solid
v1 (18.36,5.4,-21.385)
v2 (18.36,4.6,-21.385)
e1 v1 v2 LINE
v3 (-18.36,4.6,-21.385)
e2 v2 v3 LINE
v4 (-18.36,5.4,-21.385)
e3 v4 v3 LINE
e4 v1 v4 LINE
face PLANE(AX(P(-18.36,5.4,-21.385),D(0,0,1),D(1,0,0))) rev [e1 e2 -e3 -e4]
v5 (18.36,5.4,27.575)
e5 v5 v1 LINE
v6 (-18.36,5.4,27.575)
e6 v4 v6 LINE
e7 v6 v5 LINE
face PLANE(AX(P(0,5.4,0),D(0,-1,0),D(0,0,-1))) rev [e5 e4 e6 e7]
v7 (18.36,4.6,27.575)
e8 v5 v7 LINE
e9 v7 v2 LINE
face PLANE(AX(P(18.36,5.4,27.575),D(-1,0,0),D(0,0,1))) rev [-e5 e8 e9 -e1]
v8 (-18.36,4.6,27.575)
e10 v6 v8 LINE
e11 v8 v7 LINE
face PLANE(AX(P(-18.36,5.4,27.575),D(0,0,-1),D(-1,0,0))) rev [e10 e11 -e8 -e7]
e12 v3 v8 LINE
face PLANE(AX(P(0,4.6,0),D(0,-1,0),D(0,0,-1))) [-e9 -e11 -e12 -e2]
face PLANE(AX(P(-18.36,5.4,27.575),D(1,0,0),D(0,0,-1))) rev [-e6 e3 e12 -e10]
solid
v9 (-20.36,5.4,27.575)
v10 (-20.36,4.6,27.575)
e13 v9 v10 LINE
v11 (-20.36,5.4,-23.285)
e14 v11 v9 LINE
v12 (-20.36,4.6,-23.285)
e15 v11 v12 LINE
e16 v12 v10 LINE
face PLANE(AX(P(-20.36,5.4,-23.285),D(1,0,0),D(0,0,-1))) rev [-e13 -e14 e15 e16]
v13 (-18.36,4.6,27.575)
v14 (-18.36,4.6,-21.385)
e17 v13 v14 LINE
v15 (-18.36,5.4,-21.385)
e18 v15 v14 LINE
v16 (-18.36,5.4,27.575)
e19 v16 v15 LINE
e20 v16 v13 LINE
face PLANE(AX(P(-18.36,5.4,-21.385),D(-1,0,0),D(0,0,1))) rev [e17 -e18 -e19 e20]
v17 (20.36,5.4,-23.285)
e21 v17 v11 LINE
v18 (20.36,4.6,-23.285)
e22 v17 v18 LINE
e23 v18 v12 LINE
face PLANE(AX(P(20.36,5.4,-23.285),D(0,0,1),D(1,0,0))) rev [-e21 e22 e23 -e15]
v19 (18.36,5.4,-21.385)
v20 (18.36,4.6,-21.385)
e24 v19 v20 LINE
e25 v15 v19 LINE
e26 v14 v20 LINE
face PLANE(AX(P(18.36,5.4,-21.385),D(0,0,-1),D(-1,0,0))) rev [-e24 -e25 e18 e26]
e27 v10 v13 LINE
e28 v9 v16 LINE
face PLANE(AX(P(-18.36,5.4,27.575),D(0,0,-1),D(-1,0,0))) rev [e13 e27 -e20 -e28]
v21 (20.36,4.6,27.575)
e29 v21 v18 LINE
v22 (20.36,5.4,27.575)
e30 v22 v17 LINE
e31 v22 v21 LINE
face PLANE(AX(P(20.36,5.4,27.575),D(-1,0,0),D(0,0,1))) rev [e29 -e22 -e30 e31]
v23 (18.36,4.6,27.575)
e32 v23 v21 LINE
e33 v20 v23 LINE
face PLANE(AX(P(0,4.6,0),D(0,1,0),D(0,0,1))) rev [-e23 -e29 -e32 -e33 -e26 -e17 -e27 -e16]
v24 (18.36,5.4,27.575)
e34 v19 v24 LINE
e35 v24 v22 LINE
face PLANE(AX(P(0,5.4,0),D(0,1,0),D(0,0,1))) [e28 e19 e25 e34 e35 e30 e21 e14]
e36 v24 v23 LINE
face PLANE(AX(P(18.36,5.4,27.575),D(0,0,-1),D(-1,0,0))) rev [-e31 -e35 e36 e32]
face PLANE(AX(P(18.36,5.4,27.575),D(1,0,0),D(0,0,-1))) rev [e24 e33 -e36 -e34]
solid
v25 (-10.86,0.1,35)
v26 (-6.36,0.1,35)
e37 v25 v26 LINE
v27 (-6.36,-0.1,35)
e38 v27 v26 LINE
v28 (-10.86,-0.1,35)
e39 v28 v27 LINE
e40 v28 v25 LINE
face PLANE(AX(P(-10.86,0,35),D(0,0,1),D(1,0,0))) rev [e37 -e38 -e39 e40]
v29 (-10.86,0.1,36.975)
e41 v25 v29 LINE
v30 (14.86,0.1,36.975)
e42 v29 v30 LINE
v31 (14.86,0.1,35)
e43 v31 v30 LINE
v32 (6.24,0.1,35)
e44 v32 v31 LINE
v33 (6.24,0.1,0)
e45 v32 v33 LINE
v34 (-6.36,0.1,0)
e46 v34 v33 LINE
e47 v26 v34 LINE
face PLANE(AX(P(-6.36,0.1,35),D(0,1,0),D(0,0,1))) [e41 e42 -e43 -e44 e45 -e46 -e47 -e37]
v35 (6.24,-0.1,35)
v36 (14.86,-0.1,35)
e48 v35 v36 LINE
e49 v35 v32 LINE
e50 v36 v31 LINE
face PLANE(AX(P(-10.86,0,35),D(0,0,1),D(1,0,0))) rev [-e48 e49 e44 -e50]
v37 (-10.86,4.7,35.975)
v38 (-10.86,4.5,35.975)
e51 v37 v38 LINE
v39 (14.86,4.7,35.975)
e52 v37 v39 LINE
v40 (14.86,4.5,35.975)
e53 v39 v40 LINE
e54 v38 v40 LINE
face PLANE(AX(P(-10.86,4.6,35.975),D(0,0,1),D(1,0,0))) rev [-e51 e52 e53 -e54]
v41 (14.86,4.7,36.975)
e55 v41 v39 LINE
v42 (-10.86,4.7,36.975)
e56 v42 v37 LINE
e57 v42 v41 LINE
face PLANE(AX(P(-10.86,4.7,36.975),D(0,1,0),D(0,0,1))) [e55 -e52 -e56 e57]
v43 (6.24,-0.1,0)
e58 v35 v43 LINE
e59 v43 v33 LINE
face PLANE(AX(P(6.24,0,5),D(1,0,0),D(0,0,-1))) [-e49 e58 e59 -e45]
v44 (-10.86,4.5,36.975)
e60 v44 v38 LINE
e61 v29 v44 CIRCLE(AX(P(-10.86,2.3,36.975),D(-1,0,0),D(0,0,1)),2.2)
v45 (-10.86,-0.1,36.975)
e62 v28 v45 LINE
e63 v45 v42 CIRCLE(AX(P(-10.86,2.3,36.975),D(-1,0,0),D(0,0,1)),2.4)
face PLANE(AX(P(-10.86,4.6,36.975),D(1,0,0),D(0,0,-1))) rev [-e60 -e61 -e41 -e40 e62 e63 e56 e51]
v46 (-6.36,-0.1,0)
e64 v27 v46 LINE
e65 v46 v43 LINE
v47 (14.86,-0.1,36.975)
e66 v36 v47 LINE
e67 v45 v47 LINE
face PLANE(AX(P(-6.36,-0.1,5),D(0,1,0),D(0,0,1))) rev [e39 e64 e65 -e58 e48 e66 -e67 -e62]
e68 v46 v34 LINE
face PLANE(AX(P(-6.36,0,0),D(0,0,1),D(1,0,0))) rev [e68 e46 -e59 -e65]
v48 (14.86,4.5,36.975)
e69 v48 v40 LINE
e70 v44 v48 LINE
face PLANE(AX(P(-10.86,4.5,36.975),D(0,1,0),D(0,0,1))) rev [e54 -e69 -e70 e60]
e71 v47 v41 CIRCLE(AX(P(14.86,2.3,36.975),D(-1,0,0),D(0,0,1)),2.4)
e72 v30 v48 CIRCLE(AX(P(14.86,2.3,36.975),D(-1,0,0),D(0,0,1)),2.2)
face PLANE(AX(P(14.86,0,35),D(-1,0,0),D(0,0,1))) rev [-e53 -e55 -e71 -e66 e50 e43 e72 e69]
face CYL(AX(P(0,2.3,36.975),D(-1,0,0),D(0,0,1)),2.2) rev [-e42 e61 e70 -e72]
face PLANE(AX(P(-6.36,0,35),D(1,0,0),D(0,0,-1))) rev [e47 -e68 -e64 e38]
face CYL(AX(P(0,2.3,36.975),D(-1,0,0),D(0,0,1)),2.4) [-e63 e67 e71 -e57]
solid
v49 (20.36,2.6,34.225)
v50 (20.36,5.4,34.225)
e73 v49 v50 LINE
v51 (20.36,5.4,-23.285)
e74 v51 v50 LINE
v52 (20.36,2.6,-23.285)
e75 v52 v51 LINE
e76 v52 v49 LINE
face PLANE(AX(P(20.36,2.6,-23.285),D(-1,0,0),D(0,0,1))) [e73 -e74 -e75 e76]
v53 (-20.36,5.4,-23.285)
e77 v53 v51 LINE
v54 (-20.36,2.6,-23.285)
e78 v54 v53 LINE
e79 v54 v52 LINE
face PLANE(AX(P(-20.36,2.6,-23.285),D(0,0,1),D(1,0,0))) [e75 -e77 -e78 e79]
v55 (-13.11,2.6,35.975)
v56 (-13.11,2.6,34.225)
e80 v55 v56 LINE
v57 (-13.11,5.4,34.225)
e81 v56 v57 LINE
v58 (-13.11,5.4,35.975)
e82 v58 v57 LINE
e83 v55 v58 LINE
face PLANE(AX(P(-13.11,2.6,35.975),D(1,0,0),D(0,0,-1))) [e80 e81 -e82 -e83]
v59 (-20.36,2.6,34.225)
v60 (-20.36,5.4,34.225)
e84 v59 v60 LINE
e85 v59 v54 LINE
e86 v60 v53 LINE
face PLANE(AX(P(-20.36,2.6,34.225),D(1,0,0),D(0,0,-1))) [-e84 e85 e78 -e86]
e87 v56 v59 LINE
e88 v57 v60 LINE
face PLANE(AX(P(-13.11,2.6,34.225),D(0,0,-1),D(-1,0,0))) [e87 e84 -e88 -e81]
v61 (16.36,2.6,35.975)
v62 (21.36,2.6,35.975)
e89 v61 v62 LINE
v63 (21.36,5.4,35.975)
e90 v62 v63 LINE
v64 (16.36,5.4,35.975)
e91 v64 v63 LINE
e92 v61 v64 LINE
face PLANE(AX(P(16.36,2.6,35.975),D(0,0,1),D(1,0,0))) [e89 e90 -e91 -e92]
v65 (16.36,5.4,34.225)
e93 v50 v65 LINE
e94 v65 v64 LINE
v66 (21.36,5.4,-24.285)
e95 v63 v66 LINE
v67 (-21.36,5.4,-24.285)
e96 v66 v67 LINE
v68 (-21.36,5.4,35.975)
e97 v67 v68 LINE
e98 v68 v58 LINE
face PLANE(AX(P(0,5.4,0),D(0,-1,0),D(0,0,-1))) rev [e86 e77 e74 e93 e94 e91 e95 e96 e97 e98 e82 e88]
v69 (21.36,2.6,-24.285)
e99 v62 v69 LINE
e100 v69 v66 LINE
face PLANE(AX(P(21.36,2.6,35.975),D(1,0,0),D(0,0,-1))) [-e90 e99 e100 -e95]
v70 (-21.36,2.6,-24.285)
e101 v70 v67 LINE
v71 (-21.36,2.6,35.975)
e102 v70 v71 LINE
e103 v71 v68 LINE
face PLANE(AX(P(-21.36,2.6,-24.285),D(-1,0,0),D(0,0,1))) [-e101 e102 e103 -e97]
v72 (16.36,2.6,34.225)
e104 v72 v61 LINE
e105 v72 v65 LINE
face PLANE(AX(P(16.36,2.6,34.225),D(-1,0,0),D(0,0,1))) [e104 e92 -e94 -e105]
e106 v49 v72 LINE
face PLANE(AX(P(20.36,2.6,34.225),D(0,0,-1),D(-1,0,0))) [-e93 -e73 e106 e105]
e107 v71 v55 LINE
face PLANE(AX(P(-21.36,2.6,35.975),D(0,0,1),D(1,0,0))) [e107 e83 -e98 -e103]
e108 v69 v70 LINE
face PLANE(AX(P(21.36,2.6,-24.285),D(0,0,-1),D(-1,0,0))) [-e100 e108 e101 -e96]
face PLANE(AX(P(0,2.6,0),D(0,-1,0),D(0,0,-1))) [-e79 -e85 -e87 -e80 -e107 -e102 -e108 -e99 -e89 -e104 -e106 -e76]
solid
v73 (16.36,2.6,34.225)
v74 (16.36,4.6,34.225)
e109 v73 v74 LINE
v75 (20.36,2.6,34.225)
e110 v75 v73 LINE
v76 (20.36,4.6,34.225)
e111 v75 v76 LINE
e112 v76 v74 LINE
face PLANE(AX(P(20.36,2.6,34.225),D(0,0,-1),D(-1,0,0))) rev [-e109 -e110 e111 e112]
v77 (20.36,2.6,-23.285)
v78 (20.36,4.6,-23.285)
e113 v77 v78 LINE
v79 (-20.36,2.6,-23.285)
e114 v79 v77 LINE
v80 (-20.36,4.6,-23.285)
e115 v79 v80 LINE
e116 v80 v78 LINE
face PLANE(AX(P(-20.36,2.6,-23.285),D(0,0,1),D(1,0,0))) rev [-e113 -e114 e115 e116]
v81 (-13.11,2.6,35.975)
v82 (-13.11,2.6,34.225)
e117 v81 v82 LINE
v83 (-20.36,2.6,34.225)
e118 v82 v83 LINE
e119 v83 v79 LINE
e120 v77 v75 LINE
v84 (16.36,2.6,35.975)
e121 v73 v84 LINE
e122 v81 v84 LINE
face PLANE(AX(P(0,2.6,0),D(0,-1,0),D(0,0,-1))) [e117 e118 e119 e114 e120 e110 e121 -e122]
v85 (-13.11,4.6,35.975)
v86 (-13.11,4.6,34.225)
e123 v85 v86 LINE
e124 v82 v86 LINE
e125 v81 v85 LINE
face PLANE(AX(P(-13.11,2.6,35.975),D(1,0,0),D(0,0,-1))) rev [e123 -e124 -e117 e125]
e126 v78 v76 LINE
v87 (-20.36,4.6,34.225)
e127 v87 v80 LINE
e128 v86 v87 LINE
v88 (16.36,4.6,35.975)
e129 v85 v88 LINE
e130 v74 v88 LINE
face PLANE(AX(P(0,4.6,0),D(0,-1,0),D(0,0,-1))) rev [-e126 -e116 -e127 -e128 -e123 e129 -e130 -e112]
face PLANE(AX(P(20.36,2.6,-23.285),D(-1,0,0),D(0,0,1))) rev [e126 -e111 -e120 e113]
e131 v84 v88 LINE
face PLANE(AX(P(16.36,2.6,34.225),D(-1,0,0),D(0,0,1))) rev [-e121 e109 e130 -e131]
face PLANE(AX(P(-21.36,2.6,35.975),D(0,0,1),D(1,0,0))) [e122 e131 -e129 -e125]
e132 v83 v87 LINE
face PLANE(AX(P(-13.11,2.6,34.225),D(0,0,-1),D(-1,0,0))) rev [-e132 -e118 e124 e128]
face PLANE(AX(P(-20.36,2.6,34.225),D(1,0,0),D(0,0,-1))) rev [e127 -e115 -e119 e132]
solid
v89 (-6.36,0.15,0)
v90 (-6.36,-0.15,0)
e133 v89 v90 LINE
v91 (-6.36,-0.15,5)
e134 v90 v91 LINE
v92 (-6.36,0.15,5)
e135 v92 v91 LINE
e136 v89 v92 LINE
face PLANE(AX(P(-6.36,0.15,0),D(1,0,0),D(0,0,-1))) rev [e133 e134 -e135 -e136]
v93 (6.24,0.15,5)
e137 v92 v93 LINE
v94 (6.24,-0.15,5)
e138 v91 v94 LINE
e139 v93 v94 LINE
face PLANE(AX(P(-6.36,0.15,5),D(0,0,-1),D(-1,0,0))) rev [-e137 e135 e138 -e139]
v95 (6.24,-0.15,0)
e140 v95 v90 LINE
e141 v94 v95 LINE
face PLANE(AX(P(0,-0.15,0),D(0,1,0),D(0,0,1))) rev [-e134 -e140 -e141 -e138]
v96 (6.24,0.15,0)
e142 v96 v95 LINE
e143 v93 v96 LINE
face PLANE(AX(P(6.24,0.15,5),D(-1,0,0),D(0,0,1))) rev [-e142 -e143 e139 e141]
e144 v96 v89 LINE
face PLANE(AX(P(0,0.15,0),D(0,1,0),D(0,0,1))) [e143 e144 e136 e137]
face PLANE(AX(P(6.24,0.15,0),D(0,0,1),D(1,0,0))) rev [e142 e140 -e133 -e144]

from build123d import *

# Parameters (mm, degrees)
SKETCH2_W                = 42.72
SKETCH2_H                = 60.26
BOSS_EXTRUDE1_DEPTH      = 2
SKETCH3_W                = 36.72
SKETCH3_H                = 48.96
BOSS_EXTRUDE2_DEPTH      = 0.8
BOSS_EXTRUDE3_DEPTH      = 0.8
BOSS_EXTRUDE4_DEPTH      = 0.8
BOSS_EXTRUDE4_DEPTH_BACK = 2
CUT_EXTRUDE1_DEPTH       = 42.886157916
SKETCH13_W               = 12.6
SKETCH13_H               = 5
BOSS_EXTRUDE6_DEPTH      = 0.15
THICKEN4_START           = -6.36
THICKEN4_DEPTH           = 12.6
THICKEN4_START_2         = -10.86
THICKEN4_2_DEPTH         = 25.72


# Read off the part's stored shape, not the designer's step: Thicken4
with BuildPart() as part:
    # Sketch2 → Boss-Extrude1 (new body)
    with BuildSketch(Plane(origin=(0, 4.6, 0), x_dir=(1, 0, 0), z_dir=(0, 1, 0))):
        with Locations((0, -5.845)):
            Rectangle(SKETCH2_W, SKETCH2_H)
    extrude(amount=-BOSS_EXTRUDE1_DEPTH)

    # Sketch5<2> → Cut-Extrude1 (cut, through all)
    with BuildSketch(Plane(origin=(0, 4.6, 0), x_dir=(1, 0, 0), z_dir=(0, 1, 0))):
        Polygon((-20.36, 23.285), (20.36, 23.285), (20.36, -34.225), (16.36, -34.225), (16.36, -35.975), (21.36, -35.975), (21.36, 24.285), (-21.36, 24.285), (-21.36, -35.975), (-13.11, -35.975), (-13.11, -34.225), (-20.36, -34.225), align=None)
    extrude(amount=-CUT_EXTRUDE1_DEPTH, mode=Mode.SUBTRACT)


with BuildPart() as body_2:
    # Sketch3 → Boss-Extrude2 (new body)
    with BuildSketch(Plane(origin=(0, 4.6, 0), x_dir=(1, 0, 0), z_dir=(0, 1, 0))):
        with Locations((0, -3.095)):
            Rectangle(SKETCH3_W, SKETCH3_H)
    extrude(amount=BOSS_EXTRUDE2_DEPTH)


with BuildPart() as body_3:
    # Sketch4 → Boss-Extrude3 (new body)
    with BuildSketch(Plane(origin=(0, 4.6, 0), x_dir=(1, 0, 0), z_dir=(0, 1, 0))):
        Polygon((-18.36, -27.575), (-20.36, -27.575), (-20.36, 23.285), (20.36, 23.285), (20.36, -27.575), (18.36, -27.575), (18.36, 21.385), (-18.36, 21.385), align=None)
    extrude(amount=BOSS_EXTRUDE3_DEPTH)


with BuildPart() as body_4:
    # Sketch5 → Boss-Extrude4 (new, two sides: drawn at the far end of the back side and taken through both)
    with BuildSketch(Plane(origin=(0, 4.6, 0), x_dir=(1, 0, 0), z_dir=(0, 1, 0)).offset(-BOSS_EXTRUDE4_DEPTH_BACK)):
        Polygon((-20.36, 23.285), (20.36, 23.285), (20.36, -34.225), (16.36, -34.225), (16.36, -35.975), (21.36, -35.975), (21.36, 24.285), (-21.36, 24.285), (-21.36, -35.975), (-13.11, -35.975), (-13.11, -34.225), (-20.36, -34.225), align=None)
    extrude(amount=BOSS_EXTRUDE4_DEPTH + BOSS_EXTRUDE4_DEPTH_BACK)


with BuildPart() as body_5:
    # Sketch13 → Boss-Extrude6 (new, symmetric)
    with BuildSketch(Plane(origin=(0, 0, 0), x_dir=(1, 0, 0), z_dir=(0, 1, 0))):
        with Locations((-0.06, -2.5)):
            Rectangle(SKETCH13_W, SKETCH13_H)
    extrude(amount=BOSS_EXTRUDE6_DEPTH, both=True)


with BuildPart() as body_6:
    # Thicken4 outline → Thicken4 (new body)
    with BuildSketch(Plane.YZ.offset(THICKEN4_START)):
        with BuildLine():
            Line((0.1, 0), (0.1, 36.975))
            ThreePointArc((0.1, 36.975), (2.3, 39.175), (4.5, 36.975))
            Line((4.5, 36.975), (4.5, 35.975))
            Line((4.5, 35.975), (4.7, 35.975))
            Line((4.7, 35.975), (4.7, 36.975))
            ThreePointArc((4.7, 36.975), (2.3, 39.375), (-0.1, 36.975))
            Line((-0.1, 36.975), (-0.1, 0))
            Line((-0.1, 0), (0.1, 0))
        make_face()
    extrude(amount=THICKEN4_DEPTH)

    # Thicken4 2 outline → Thicken4 2 (add)
    with BuildSketch(Plane.YZ.offset(THICKEN4_START_2)):
        with BuildLine():
            Line((-0.1, 35), (0.1, 35))
            Line((0.1, 35), (0.1, 36.975))
            ThreePointArc((0.1, 36.975), (2.3, 39.175), (4.5, 36.975))
            Line((4.5, 36.975), (4.5, 35.975))
            Line((4.5, 35.975), (4.7, 35.975))
            Line((4.7, 35.975), (4.7, 36.975))
            ThreePointArc((4.7, 36.975), (2.3, 39.375), (-0.1, 36.975))
            Line((-0.1, 36.975), (-0.1, 35))
        make_face()
    extrude(amount=THICKEN4_2_DEPTH)


solid = Compound([part.part, body_2.part, body_3.part, body_4.part, body_5.part, body_6.part])
